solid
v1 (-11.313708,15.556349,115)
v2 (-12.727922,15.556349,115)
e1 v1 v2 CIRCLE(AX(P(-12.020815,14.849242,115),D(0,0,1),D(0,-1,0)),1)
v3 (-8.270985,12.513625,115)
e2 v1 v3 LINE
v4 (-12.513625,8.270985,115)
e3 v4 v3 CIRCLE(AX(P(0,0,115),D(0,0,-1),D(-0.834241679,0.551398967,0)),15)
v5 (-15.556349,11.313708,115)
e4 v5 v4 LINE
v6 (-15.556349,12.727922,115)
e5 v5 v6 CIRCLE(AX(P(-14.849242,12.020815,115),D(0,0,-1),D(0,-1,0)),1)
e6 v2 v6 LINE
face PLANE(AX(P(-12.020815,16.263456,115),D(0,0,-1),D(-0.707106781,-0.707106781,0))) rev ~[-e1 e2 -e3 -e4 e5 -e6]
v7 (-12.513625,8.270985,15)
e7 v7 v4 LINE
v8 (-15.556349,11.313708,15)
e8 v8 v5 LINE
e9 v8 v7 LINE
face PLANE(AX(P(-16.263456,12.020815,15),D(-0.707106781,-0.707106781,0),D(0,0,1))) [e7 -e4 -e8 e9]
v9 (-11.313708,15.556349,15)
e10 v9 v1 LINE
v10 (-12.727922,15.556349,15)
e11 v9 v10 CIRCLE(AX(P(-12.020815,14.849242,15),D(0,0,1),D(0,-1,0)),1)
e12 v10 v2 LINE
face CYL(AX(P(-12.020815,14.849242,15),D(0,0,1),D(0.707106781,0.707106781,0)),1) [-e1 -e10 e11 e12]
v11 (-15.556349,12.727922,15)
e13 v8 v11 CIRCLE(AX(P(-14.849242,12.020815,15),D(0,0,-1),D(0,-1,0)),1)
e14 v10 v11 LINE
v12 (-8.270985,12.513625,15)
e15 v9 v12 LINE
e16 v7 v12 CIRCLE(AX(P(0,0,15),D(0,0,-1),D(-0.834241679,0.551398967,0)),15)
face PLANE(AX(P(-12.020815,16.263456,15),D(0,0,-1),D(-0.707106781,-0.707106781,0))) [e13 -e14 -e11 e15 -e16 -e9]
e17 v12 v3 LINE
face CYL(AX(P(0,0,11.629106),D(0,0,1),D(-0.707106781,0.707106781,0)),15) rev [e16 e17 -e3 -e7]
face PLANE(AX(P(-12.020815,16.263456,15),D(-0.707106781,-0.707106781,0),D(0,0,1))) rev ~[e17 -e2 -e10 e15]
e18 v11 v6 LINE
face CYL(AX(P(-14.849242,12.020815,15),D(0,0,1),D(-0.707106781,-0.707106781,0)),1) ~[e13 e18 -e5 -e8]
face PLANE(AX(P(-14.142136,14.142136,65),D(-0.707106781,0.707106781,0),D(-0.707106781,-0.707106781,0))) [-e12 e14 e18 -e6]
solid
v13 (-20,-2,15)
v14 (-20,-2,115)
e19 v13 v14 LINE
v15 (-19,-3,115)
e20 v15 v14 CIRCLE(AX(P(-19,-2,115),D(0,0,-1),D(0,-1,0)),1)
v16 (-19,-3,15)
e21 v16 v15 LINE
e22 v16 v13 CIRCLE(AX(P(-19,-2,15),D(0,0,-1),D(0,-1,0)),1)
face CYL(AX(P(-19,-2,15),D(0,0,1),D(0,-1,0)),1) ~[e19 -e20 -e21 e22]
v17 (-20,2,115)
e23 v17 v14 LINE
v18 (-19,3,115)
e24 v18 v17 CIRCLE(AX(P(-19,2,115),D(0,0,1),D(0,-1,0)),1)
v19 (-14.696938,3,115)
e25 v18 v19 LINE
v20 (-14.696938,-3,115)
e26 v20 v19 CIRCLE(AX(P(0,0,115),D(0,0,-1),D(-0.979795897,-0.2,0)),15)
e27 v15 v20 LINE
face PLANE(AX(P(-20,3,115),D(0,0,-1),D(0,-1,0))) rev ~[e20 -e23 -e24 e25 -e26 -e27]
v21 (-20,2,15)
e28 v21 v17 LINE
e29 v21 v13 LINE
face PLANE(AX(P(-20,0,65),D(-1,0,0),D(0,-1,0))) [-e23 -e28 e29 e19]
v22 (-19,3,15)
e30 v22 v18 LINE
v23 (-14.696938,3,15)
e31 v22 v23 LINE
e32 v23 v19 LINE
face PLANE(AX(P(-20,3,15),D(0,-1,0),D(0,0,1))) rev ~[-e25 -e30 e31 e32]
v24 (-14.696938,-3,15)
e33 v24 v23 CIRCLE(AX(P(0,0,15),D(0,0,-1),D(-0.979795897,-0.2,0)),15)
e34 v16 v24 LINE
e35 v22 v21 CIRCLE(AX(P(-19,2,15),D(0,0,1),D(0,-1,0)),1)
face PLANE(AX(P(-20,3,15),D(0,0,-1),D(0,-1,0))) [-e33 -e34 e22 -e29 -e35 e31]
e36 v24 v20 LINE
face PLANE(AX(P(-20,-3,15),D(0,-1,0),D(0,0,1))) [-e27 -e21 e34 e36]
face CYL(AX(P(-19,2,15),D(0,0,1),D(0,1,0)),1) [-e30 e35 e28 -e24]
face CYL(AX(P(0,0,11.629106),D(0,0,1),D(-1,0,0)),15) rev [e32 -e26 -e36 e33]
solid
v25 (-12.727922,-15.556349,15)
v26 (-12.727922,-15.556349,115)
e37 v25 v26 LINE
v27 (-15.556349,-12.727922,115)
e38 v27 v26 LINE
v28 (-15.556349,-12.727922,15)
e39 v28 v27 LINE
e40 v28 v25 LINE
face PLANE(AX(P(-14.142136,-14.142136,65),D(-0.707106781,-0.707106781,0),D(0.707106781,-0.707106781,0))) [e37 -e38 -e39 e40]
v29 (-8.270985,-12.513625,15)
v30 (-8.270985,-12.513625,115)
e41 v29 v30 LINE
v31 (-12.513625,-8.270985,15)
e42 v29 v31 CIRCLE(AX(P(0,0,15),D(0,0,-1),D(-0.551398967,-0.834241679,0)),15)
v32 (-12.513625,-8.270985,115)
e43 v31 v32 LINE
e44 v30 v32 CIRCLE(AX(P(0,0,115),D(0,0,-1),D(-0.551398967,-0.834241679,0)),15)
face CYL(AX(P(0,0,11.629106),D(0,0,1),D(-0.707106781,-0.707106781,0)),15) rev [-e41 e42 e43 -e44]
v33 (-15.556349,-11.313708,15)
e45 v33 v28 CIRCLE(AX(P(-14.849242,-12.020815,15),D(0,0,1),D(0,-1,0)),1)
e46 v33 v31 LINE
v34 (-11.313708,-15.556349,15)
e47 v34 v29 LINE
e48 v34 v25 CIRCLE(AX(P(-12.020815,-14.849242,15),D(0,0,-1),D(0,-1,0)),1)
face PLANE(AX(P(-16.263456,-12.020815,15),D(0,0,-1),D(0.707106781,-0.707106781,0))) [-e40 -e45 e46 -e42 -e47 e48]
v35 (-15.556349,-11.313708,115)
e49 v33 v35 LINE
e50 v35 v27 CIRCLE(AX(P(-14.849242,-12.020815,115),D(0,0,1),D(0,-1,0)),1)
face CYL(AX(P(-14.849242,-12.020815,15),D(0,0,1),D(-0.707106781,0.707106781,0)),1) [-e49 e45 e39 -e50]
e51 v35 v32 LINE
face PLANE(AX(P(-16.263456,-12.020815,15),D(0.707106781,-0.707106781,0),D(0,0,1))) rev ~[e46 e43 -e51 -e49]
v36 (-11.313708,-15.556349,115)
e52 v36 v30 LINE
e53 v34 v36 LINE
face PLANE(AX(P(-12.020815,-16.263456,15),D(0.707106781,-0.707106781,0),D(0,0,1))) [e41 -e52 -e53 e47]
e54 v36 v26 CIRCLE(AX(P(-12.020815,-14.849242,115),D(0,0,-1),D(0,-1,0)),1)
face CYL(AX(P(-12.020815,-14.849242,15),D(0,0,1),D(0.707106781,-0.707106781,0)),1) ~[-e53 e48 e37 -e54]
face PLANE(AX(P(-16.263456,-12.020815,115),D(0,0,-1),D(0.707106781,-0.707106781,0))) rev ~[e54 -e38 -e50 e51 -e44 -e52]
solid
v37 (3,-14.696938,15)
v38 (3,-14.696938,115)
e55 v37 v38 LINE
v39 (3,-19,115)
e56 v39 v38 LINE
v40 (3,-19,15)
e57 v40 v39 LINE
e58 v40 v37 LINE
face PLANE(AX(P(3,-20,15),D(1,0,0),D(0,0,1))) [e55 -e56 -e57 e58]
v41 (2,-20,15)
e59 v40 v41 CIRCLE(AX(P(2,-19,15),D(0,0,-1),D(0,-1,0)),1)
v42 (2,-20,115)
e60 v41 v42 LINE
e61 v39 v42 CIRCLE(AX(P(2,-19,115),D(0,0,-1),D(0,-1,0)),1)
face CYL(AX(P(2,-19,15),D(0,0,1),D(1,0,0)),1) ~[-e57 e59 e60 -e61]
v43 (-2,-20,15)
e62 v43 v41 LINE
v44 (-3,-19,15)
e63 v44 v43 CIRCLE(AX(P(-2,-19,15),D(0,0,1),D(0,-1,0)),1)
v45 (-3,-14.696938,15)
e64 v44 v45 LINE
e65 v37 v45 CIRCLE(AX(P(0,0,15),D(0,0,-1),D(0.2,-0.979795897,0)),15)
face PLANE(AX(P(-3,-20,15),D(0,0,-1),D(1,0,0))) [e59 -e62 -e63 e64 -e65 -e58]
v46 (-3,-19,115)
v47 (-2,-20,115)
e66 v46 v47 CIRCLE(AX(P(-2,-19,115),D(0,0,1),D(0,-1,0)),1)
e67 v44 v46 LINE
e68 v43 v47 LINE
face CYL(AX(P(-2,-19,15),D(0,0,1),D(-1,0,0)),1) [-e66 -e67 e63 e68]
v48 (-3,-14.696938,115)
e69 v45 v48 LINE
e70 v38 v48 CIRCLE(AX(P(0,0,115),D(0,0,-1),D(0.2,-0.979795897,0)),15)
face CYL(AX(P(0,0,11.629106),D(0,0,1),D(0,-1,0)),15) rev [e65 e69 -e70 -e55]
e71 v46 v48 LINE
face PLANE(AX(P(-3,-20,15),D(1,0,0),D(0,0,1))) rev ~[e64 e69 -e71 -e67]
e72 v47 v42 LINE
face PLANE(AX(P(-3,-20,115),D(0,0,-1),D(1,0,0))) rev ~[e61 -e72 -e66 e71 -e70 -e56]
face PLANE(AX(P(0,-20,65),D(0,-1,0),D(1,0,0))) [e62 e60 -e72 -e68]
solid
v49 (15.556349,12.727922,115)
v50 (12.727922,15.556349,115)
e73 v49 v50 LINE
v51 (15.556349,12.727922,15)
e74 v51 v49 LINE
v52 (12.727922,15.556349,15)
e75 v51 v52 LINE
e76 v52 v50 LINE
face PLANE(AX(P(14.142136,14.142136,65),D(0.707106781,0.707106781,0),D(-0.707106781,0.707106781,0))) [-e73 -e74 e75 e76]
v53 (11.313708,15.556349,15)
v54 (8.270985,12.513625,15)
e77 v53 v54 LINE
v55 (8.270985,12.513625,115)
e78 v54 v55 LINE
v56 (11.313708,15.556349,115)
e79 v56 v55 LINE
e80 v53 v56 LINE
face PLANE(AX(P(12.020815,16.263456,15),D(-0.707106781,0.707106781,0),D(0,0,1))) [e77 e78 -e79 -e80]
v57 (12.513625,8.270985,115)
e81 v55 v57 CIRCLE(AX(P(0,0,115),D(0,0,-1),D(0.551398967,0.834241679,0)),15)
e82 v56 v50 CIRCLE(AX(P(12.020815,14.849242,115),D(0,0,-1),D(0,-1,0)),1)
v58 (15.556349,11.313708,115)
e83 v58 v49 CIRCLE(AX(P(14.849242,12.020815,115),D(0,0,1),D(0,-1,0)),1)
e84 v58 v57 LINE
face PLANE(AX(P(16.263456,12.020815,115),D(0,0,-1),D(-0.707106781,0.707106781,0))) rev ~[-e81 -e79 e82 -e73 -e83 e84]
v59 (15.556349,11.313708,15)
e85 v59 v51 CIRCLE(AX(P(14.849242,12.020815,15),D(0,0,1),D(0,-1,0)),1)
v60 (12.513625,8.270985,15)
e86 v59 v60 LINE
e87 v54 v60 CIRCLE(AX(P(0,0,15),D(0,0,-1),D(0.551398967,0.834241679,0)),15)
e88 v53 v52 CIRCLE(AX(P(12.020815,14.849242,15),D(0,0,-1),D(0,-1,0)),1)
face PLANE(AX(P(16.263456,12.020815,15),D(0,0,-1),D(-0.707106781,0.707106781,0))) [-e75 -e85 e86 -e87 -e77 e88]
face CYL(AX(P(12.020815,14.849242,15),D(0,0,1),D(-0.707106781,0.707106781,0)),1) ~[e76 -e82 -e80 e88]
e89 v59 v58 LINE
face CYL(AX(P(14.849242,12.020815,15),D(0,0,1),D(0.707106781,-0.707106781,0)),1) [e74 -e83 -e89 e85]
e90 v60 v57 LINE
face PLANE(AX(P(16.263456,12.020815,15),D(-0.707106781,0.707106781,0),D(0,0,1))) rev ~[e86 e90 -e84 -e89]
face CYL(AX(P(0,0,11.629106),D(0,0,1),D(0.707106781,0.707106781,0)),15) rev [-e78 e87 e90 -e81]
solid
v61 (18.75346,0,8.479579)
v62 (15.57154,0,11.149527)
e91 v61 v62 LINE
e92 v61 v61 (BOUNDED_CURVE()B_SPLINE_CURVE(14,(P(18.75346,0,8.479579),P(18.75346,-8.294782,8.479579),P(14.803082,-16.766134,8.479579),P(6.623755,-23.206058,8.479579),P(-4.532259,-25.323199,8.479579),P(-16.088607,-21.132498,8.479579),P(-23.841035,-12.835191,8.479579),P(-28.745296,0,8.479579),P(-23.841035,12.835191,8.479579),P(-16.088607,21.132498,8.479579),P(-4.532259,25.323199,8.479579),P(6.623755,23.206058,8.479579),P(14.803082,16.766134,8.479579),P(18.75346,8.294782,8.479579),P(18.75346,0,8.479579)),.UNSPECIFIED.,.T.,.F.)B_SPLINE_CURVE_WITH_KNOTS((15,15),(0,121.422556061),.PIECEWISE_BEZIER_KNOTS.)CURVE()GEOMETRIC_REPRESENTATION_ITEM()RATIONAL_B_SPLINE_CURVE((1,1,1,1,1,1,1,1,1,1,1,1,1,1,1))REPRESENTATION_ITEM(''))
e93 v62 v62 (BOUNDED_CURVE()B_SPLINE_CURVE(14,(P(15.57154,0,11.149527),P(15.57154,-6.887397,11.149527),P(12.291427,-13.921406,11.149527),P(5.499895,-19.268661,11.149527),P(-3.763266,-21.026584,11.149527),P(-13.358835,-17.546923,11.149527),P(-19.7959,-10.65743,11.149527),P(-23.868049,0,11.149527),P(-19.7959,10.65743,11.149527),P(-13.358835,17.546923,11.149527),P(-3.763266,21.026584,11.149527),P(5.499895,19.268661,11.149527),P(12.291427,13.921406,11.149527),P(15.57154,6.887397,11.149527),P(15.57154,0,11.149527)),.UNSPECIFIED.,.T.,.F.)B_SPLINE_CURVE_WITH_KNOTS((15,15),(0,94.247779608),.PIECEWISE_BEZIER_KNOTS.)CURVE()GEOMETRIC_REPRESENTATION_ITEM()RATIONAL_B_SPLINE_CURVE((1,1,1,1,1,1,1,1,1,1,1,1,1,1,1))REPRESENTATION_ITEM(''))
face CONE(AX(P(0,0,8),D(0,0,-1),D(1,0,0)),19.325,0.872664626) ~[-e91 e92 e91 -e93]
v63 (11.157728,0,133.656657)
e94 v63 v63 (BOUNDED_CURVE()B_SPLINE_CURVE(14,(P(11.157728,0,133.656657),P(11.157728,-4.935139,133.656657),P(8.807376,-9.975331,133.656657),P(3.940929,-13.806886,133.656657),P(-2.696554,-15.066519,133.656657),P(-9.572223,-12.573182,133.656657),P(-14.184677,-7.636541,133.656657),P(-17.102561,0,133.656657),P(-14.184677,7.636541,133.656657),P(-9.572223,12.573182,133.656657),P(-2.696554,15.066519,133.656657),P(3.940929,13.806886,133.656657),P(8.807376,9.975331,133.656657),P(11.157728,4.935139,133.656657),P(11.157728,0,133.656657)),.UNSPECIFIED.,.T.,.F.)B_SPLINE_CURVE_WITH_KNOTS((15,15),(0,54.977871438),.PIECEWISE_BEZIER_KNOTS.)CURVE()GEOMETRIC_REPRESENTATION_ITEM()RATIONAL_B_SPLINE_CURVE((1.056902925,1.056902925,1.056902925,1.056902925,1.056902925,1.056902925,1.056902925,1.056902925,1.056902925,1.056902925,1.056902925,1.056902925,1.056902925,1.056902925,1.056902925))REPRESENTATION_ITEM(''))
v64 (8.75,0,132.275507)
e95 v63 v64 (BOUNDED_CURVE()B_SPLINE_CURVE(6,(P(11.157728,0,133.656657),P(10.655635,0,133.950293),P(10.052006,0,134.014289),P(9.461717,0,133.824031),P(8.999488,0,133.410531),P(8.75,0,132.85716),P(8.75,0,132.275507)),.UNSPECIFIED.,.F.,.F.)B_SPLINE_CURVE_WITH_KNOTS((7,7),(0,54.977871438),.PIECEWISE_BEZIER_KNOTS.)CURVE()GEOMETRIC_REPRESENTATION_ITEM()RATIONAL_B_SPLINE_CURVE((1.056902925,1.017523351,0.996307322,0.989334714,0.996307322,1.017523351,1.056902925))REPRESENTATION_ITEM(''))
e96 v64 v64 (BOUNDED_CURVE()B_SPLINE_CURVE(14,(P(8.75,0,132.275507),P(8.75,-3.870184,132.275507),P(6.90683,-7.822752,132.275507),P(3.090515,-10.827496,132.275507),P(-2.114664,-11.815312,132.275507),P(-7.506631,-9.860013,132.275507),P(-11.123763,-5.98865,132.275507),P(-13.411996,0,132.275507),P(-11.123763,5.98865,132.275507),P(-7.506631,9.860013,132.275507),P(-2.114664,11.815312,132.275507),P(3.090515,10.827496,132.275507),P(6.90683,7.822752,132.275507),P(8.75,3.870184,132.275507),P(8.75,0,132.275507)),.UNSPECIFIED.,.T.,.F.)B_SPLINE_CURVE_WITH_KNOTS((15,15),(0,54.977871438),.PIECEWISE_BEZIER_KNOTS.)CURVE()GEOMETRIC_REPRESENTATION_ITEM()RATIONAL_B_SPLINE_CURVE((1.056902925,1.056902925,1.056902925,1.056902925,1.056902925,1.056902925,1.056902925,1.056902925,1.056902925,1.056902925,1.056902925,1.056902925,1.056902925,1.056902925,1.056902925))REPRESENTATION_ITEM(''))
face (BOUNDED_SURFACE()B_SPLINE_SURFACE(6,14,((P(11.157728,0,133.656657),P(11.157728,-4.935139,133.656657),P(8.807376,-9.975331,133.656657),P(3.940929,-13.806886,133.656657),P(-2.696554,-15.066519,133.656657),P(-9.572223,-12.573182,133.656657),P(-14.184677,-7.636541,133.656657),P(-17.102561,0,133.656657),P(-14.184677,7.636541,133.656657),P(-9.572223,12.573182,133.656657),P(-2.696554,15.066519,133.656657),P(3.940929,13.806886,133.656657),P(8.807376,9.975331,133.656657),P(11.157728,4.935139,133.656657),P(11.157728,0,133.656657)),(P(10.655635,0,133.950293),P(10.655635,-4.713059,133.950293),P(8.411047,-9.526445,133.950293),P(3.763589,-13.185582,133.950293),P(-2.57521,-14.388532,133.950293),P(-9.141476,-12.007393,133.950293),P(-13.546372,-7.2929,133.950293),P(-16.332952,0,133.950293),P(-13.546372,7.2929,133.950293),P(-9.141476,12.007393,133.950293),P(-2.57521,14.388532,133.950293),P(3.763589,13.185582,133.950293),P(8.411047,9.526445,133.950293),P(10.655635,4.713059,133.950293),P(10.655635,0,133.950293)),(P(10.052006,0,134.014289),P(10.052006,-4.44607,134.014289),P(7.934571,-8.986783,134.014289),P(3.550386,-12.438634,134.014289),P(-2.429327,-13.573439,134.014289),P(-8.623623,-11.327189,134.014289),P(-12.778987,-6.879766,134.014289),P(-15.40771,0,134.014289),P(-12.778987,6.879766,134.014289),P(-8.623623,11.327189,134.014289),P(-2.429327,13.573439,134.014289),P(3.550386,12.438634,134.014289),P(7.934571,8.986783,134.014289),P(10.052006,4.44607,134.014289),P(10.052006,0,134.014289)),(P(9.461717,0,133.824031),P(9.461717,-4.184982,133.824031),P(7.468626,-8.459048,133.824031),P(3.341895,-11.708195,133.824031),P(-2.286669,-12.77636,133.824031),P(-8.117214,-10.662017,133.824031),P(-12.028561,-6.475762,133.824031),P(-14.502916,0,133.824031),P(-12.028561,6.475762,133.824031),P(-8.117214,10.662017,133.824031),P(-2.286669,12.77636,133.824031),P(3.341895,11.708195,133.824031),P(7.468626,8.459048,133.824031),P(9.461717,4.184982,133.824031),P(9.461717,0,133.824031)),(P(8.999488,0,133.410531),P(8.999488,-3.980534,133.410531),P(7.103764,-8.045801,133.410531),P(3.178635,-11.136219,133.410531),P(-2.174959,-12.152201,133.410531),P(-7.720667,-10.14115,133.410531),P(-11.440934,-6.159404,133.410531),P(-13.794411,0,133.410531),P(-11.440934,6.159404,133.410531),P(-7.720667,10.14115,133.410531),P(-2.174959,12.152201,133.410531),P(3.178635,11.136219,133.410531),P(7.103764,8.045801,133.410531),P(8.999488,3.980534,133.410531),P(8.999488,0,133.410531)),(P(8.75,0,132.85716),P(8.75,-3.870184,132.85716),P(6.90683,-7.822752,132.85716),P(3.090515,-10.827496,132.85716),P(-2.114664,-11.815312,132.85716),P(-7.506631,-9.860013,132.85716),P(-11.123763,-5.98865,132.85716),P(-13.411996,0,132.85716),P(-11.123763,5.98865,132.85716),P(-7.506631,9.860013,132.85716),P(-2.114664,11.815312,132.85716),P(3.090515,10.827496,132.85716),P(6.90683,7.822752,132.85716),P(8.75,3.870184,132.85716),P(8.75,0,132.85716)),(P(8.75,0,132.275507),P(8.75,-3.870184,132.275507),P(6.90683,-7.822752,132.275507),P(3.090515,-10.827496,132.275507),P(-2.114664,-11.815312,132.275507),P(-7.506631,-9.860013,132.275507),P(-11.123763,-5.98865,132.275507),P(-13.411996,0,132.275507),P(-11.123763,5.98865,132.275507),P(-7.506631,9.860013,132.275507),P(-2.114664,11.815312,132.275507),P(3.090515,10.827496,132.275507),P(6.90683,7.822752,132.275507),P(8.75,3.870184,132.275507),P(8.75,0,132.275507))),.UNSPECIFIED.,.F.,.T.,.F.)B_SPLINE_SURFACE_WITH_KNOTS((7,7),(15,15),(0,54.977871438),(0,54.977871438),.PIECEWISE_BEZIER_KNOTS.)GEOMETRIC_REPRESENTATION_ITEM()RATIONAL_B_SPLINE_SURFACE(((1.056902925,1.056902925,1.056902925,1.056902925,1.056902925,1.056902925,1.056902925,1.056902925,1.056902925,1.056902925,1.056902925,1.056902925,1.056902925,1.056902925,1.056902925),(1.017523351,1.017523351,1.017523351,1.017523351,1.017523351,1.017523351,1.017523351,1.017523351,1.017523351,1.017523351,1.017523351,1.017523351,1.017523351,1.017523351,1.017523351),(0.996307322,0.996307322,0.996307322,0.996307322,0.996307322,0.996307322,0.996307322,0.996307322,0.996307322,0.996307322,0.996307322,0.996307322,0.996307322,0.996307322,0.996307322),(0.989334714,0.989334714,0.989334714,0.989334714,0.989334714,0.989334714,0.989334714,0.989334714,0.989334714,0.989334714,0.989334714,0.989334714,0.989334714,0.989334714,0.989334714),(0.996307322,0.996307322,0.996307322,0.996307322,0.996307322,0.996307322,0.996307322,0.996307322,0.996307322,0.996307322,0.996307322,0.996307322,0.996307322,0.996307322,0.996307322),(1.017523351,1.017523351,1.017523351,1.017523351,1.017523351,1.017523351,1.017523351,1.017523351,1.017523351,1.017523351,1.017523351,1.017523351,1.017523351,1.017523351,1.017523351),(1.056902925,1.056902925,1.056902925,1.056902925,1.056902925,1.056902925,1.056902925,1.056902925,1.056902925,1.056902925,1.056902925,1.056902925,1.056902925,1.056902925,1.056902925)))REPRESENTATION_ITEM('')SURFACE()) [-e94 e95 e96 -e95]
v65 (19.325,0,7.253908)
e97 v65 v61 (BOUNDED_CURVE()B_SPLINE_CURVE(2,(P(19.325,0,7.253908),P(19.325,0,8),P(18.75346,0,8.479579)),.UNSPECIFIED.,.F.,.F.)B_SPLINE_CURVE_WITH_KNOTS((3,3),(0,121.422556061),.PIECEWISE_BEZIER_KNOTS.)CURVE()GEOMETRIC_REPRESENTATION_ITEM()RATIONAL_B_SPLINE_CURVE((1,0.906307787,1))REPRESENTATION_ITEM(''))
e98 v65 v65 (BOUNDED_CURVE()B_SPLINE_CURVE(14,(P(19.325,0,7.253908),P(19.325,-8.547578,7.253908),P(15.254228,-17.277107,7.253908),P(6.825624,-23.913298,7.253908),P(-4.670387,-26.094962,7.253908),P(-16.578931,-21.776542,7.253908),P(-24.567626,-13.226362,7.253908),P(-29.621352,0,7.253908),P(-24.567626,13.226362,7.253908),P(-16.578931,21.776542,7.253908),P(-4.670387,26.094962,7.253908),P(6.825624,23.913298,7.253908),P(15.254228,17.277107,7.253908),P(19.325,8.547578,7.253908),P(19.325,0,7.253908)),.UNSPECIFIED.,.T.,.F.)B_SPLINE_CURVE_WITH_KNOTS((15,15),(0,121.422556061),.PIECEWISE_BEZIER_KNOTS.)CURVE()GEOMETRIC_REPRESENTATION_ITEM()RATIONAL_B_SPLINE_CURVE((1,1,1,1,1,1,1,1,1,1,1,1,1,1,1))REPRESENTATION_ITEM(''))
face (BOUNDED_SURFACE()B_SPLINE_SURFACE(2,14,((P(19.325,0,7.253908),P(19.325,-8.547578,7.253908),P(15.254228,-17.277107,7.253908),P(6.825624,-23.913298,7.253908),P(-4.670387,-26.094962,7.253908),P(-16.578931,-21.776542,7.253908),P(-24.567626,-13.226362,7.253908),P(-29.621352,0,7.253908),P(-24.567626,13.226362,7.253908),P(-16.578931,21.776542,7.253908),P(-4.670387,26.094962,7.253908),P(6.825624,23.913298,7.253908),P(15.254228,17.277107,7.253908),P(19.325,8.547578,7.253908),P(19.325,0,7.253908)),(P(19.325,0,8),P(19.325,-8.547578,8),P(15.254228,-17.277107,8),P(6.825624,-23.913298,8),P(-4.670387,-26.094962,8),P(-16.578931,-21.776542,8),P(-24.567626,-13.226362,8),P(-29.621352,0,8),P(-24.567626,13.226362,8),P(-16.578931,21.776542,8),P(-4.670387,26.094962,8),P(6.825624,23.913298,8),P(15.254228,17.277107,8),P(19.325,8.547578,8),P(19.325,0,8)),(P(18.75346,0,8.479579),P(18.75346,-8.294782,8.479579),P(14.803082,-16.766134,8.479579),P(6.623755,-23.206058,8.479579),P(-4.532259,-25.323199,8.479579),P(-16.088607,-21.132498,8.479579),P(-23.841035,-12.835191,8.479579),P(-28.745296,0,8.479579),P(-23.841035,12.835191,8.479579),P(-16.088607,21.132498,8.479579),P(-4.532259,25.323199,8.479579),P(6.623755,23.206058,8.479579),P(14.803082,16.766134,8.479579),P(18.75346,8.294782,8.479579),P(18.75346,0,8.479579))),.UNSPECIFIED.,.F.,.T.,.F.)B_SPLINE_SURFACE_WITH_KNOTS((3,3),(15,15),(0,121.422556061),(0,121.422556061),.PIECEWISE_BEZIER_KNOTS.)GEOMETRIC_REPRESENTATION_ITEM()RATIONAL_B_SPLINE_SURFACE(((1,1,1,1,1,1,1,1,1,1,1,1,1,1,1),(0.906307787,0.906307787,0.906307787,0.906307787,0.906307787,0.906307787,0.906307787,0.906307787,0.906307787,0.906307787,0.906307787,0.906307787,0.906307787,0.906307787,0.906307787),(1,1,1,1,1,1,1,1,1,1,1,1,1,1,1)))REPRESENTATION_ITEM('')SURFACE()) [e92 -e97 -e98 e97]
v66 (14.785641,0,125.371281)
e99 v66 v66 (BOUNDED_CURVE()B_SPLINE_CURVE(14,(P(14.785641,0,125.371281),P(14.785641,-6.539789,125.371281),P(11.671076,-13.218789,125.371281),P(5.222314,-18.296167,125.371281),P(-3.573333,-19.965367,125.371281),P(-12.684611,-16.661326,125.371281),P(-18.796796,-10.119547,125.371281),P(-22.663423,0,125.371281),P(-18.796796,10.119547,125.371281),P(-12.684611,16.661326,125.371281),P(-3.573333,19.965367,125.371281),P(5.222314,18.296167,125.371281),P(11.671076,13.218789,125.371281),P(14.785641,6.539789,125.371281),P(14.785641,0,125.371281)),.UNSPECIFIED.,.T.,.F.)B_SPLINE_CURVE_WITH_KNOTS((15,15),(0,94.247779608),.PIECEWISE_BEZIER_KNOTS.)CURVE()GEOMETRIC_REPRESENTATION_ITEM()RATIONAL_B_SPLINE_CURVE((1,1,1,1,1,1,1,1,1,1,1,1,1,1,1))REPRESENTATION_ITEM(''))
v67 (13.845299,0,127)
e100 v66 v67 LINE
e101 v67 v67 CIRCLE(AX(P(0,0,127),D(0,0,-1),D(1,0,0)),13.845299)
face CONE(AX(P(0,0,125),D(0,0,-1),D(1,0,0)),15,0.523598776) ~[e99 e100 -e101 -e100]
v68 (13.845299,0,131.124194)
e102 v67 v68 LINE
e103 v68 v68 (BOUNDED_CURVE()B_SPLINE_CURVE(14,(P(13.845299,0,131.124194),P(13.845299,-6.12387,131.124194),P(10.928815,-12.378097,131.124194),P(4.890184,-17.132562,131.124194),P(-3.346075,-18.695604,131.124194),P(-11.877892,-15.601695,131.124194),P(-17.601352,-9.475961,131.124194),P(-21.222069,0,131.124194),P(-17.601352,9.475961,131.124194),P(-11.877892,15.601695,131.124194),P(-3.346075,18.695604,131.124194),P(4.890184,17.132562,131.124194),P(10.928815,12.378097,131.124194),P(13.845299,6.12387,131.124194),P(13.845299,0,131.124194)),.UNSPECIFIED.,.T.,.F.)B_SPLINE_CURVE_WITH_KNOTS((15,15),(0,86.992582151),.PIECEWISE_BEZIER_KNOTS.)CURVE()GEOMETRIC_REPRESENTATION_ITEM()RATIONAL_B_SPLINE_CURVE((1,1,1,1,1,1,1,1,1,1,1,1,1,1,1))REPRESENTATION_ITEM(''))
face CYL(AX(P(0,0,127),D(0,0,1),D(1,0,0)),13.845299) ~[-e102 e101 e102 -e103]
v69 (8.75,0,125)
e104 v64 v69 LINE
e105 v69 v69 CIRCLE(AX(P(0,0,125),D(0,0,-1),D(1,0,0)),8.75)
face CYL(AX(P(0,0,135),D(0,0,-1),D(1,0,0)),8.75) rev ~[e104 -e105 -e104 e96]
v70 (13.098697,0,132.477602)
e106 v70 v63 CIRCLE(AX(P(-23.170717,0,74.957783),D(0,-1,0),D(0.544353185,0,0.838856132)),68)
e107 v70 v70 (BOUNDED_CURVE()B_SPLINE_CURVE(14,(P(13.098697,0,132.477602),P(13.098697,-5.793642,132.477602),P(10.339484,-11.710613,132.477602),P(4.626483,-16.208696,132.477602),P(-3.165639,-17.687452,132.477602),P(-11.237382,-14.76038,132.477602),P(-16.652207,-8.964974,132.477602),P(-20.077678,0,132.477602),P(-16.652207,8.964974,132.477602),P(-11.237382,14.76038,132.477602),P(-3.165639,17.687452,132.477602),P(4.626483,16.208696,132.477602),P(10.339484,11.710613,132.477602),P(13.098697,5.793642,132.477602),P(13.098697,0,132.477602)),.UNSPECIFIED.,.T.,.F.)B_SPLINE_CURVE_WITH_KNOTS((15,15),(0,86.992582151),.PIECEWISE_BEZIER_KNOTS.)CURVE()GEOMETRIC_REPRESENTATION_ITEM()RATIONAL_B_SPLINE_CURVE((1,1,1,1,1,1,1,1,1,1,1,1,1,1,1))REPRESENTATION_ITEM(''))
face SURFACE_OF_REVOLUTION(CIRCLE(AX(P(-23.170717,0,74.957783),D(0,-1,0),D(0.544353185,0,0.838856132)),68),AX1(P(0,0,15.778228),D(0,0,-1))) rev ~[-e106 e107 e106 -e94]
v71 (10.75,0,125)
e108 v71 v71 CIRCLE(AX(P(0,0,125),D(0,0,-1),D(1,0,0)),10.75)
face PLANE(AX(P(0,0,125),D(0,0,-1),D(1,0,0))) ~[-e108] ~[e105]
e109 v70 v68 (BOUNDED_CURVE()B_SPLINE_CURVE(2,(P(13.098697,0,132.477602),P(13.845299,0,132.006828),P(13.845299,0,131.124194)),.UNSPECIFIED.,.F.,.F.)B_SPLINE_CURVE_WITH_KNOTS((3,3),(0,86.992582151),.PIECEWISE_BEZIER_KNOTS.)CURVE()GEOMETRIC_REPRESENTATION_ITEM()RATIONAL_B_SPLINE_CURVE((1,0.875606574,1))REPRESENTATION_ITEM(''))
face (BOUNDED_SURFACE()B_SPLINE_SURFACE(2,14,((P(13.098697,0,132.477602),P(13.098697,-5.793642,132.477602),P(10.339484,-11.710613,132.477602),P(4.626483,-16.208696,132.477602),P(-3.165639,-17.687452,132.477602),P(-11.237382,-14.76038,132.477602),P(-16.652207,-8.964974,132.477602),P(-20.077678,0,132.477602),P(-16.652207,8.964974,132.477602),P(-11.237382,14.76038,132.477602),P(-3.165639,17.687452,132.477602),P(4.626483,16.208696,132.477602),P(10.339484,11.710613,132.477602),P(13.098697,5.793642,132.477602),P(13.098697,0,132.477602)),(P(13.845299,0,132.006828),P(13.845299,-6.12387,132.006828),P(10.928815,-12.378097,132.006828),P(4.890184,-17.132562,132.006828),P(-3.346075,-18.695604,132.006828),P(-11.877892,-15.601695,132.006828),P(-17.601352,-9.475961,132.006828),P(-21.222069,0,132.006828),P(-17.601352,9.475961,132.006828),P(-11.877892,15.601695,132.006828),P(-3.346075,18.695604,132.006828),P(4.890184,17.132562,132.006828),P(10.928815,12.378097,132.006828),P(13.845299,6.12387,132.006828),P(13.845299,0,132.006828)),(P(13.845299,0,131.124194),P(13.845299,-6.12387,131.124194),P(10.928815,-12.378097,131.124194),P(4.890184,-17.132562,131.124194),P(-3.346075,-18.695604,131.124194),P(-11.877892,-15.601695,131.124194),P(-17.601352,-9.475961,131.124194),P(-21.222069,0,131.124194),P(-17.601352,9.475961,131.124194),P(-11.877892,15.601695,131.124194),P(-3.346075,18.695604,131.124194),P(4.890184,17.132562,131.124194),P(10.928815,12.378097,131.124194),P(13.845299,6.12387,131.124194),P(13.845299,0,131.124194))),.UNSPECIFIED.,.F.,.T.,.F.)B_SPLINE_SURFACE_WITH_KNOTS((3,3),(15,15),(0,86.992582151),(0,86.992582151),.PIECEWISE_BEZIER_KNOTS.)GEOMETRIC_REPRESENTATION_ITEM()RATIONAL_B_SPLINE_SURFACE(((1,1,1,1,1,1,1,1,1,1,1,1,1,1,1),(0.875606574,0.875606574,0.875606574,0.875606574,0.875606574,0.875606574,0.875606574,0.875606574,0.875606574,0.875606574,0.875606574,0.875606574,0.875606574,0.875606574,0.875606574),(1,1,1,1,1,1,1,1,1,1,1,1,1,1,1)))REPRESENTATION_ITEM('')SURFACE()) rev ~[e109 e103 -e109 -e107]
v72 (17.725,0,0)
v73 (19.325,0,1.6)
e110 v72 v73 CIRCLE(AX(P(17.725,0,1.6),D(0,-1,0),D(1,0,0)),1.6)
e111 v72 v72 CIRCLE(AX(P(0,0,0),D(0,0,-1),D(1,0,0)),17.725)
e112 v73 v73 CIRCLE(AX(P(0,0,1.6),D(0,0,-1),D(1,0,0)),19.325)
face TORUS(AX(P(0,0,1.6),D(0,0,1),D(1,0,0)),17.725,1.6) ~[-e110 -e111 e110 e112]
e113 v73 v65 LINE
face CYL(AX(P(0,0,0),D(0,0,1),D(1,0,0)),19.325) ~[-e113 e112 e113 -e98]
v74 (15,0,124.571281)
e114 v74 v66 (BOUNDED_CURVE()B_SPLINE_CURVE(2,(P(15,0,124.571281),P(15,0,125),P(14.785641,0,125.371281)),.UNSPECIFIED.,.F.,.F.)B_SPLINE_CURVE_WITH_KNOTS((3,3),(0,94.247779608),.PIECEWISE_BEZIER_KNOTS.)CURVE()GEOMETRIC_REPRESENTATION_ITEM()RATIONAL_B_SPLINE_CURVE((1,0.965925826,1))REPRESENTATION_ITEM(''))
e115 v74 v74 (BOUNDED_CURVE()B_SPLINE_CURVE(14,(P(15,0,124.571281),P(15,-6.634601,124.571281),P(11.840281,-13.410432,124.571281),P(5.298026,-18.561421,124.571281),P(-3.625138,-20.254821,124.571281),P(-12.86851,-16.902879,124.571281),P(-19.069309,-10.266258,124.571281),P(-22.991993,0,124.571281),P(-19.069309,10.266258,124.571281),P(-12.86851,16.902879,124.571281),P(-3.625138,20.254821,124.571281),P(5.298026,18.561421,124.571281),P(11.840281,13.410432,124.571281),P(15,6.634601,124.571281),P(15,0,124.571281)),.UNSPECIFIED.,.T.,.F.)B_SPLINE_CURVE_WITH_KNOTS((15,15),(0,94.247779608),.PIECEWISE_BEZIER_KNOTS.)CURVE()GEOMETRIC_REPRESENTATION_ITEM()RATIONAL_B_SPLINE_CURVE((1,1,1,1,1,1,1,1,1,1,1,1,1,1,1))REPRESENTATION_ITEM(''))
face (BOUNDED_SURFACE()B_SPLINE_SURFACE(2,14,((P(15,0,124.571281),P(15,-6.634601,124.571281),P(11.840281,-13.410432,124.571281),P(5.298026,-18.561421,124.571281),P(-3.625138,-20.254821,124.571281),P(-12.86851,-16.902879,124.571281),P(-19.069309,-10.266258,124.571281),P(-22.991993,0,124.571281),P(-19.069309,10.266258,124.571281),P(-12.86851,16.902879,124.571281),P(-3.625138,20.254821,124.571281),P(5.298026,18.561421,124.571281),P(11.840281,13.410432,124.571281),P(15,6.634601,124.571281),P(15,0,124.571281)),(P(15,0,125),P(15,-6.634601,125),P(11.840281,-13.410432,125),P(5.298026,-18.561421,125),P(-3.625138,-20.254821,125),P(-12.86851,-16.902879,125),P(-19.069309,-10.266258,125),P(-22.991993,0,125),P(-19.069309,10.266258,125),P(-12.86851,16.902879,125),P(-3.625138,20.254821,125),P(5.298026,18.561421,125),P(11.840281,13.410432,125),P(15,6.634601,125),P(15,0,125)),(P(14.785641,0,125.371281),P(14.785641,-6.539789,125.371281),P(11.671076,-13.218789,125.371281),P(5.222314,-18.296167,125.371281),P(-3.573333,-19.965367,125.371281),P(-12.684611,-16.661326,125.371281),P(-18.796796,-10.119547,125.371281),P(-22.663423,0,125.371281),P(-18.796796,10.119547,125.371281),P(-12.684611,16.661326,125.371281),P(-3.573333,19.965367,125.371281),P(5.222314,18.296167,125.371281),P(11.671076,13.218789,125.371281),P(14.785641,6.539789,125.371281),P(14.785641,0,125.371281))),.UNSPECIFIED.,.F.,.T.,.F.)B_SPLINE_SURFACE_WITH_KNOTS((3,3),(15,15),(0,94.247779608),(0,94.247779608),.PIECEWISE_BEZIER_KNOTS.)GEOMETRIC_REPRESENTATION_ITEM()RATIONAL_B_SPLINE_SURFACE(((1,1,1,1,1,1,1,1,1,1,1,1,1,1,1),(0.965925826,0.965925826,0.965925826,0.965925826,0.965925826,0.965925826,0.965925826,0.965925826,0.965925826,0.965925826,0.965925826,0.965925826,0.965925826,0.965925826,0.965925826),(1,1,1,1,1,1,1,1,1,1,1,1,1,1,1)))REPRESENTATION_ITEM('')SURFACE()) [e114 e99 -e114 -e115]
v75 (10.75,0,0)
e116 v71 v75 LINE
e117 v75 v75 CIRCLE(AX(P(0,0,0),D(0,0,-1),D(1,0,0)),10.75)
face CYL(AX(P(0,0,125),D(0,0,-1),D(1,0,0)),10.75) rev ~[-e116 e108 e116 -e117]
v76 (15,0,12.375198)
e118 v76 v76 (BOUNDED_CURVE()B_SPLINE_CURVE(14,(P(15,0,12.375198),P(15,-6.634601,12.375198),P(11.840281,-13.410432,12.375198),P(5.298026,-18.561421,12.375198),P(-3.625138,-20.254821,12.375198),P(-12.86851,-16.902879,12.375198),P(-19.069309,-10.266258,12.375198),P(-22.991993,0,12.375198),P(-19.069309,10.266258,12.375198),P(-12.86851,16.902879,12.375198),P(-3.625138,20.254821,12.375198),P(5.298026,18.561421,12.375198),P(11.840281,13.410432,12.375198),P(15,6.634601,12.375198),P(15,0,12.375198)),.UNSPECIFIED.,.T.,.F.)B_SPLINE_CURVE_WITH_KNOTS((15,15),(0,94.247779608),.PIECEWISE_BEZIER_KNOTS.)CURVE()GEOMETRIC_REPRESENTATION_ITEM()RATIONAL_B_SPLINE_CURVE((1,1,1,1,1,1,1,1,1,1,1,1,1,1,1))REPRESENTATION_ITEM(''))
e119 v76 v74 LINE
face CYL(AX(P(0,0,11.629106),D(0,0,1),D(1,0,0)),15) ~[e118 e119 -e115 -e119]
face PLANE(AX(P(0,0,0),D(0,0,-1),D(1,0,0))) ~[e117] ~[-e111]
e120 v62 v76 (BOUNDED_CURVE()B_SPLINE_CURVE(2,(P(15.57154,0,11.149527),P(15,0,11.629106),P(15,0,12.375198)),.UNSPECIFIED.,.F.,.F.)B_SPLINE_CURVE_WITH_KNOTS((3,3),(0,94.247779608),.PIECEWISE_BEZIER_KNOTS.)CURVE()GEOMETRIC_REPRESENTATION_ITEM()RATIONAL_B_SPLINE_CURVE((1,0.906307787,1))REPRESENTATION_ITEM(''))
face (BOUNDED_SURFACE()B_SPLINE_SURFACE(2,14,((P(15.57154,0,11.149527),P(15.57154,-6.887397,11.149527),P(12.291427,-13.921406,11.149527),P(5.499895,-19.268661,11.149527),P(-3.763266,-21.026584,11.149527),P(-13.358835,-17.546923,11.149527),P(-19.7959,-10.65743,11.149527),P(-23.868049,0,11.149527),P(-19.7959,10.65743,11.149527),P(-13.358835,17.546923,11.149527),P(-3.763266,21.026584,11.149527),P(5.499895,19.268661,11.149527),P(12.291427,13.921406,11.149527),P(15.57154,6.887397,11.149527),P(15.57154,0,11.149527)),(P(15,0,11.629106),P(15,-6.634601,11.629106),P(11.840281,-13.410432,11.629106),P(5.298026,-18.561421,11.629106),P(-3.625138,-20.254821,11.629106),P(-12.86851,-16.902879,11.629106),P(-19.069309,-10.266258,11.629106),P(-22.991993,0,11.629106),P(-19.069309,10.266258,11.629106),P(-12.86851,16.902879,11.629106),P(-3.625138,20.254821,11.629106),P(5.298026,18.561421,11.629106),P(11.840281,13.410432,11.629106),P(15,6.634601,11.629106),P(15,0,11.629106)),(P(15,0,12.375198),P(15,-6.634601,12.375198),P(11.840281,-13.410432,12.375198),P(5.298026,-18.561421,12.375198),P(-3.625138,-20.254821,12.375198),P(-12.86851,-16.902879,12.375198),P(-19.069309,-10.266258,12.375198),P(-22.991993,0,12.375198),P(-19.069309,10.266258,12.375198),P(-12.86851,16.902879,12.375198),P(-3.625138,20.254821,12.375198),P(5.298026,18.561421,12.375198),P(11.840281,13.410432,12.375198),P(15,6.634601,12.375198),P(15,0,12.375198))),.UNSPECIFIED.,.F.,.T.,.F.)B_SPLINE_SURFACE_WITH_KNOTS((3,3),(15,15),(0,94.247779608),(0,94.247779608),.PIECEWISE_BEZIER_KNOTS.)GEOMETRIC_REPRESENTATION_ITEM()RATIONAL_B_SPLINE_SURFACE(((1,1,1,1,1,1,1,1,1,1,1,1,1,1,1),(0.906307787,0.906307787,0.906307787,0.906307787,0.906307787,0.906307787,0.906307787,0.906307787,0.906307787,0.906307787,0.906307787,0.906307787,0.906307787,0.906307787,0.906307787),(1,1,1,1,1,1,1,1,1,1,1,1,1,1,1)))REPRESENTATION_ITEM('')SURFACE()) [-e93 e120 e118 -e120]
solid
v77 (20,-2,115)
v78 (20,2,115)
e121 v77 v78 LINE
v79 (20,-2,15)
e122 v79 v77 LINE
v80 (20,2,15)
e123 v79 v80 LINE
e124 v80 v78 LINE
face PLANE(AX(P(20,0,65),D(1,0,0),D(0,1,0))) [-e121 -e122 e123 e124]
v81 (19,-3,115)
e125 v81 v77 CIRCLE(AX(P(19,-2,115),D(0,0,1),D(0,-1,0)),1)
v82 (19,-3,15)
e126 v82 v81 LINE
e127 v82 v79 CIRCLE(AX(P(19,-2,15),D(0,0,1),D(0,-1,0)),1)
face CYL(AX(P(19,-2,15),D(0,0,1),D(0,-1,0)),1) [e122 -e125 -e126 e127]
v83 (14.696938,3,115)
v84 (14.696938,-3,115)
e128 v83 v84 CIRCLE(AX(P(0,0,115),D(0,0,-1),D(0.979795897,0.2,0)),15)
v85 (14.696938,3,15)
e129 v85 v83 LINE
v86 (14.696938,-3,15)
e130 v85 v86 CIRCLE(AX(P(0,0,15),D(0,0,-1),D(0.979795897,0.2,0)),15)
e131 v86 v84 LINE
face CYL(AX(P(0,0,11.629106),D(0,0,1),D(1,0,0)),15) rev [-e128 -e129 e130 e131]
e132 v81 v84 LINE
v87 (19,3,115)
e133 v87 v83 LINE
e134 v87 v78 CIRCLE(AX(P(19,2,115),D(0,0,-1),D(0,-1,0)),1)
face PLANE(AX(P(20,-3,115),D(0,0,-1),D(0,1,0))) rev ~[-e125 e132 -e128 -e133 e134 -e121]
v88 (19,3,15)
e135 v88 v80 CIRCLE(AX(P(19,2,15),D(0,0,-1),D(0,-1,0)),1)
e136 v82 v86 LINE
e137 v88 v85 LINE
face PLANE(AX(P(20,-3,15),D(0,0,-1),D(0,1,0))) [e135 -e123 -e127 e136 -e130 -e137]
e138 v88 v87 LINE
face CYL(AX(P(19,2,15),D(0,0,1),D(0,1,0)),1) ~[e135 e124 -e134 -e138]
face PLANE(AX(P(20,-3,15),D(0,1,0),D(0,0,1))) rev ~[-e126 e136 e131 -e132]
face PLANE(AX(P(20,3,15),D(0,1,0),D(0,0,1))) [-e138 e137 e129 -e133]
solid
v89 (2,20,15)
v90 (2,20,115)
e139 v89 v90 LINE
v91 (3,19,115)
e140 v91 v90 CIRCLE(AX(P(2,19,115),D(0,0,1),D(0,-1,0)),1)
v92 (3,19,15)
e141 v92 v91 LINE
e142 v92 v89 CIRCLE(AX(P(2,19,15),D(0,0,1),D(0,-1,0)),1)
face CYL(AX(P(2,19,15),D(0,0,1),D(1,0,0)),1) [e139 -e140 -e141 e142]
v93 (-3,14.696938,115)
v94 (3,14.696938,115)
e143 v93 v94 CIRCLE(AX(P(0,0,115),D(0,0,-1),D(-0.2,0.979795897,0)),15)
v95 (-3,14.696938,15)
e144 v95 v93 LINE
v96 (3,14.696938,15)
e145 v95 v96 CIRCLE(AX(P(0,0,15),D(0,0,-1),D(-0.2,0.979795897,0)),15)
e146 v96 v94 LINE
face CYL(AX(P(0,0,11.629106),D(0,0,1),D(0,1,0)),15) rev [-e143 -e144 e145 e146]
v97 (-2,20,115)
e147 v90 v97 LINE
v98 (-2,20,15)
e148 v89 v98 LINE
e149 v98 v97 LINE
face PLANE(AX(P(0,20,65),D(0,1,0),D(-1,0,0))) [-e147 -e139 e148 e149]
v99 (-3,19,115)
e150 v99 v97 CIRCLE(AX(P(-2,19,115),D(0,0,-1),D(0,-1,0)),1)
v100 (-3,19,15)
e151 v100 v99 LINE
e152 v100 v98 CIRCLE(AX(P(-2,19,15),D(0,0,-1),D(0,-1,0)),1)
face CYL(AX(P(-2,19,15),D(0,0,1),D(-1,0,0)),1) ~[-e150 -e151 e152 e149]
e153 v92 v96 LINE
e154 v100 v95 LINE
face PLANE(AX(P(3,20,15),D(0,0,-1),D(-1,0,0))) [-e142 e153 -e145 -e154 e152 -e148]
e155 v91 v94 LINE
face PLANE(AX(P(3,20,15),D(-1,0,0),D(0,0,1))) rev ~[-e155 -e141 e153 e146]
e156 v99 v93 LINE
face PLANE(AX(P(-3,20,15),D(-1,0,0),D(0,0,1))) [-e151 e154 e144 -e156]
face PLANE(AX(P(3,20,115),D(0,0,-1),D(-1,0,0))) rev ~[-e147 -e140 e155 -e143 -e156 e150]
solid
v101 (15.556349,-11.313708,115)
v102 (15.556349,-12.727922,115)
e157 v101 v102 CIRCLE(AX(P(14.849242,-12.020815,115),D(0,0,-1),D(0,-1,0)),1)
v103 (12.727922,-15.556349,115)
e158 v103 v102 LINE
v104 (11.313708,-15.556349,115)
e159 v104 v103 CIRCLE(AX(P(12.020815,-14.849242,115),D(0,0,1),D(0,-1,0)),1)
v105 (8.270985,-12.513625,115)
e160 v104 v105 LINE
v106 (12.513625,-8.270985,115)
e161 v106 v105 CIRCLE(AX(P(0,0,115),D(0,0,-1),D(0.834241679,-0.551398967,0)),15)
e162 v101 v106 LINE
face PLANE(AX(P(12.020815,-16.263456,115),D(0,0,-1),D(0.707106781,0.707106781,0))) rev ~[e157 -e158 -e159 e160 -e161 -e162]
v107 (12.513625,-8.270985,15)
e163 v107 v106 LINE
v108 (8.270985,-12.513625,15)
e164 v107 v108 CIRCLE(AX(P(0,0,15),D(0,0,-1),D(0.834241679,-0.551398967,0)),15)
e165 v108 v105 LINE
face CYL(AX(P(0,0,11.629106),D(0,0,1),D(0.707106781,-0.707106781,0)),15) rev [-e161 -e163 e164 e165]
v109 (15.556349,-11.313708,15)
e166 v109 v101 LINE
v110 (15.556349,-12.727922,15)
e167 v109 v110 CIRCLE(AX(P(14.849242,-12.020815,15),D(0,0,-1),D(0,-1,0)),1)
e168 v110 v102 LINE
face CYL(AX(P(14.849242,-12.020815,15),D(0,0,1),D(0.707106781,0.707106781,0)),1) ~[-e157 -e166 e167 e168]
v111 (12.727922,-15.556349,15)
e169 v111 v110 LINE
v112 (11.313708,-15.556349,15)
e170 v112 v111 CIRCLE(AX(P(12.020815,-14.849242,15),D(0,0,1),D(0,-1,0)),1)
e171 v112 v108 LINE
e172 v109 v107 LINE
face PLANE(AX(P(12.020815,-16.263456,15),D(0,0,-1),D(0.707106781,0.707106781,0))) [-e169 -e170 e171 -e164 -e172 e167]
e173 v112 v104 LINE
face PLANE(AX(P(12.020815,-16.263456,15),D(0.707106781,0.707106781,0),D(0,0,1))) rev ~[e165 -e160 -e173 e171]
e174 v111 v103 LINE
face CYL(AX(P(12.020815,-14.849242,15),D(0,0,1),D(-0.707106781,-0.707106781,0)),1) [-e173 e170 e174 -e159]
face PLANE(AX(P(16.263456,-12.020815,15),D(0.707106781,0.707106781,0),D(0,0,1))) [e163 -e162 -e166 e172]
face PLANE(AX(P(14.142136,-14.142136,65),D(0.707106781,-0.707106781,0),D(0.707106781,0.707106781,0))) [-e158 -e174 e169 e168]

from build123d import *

# Parameters (mm, degrees)
F2_R            = 1.6
F4_W            = 6
F4_H            = 100
F5_COPIES_COUNT = 8
F6_R            = 1
F6_2_R          = 1
F6_3_R          = 1
F6_4_R          = 1
F6_5_R          = 1
F6_6_R          = 1
F6_7_R          = 1
F6_8_R          = 1


# Not quite as in the source:
# - a feature of the source that left no trace in its solid (it failed there, or was rolled back) is left out
# - a pattern or mirror of a feature is missing from the dataset's text; its kind, count and spacing are read off the source's solid


with BuildPart() as f1:
    # F0 (on Front) → F1 (revolve)
    with BuildSketch(Plane.XZ):
        with BuildLine():
            ThreePointArc((13.8452994616, 132), (11.3302729145, 133.5554082968), (8.75, 135))
            Line((8.75, 135), (8.75, 125))
            Line((8.75, 125), (10.75, 125))
            Line((10.75, 125), (10.75, 0))
            Line((10.75, 0), (19.325, 0))
            Line((19.325, 0), (19.325, 8))
            Line((19.325, 8), (15, 11.6291059048))
            Line((15, 11.6291059048), (15, 125))
            Line((15, 125), (13.8452994616, 127))
            Line((13.8452994616, 127), (13.8452994616, 132))
        make_face()
    revolve(axis=Axis((0, 0, 15.7782279773), (0, 0, -1)))

    # F2
    f2_edges = [f1.edges().sort_by_distance(p)[0] for p in [
        (-8.75, 0, 135),
        (-13.845299, 0, 132),
        (-15, 0, 125),
        (-15, 0, 11.629106),
        (-19.325, 0, 8),
        (-19.325, 0, 0),
    ]]
    fillet(f2_edges, radius=F2_R)


with BuildPart() as f5:
    # F4 (on offset) → F5 (new body, up to the next surface of F1)
    with BuildSketch(Plane.YZ.offset(20)):
        with Locations((0, 65)):
            Rectangle(F4_W, F4_H)
    extrude(until=Until.NEXT, target=f1.part, dir=(-1, 0, 0))


with BuildPart() as f5_copies_1:
    # F5_copies: instance of F5
    add(f5.part.rotate(Axis((0, 0, 0), (0, 0, 1)), 1 * 360 / F5_COPIES_COUNT))

    # F6#2
    f6_2_edges = [f5_copies_1.edges().sort_by_distance(p)[0] for p in [
        (16.263456, 12.020815, 65),
        (12.020815, 16.263456, 65),
    ]]
    fillet(f6_2_edges, radius=F6_2_R)


with BuildPart() as f5_copies_2:
    # F5_copies: instance of F5
    add(f5.part.rotate(Axis((0, 0, 0), (0, 0, 1)), 2 * 360 / F5_COPIES_COUNT))

    # F6#3
    f6_3_edges = [f5_copies_2.edges().sort_by_distance(p)[0] for p in [
        (3, 20, 65),
        (-3, 20, 65),
    ]]
    fillet(f6_3_edges, radius=F6_3_R)


with BuildPart() as f5_copies_3:
    # F5_copies: instance of F5
    add(f5.part.rotate(Axis((0, 0, 0), (0, 0, 1)), 3 * 360 / F5_COPIES_COUNT))

    # F6#4
    f6_4_edges = [f5_copies_3.edges().sort_by_distance(p)[0] for p in [
        (-12.020815, 16.263456, 65),
        (-16.263456, 12.020815, 65),
    ]]
    fillet(f6_4_edges, radius=F6_4_R)


with BuildPart() as f5_copies_4:
    # F5_copies: instance of F5
    add(f5.part.rotate(Axis((0, 0, 0), (0, 0, 1)), 4 * 360 / F5_COPIES_COUNT))

    # F6#5
    f6_5_edges = [f5_copies_4.edges().sort_by_distance(p)[0] for p in [
        (-20, 3, 65),
        (-20, -3, 65),
    ]]
    fillet(f6_5_edges, radius=F6_5_R)


with BuildPart() as f5_copies_5:
    # F5_copies: instance of F5
    add(f5.part.rotate(Axis((0, 0, 0), (0, 0, 1)), 5 * 360 / F5_COPIES_COUNT))

    # F6#6
    f6_6_edges = [f5_copies_5.edges().sort_by_distance(p)[0] for p in [
        (-16.263456, -12.020815, 65),
        (-12.020815, -16.263456, 65),
    ]]
    fillet(f6_6_edges, radius=F6_6_R)


with BuildPart() as f5_copies_6:
    # F5_copies: instance of F5
    add(f5.part.rotate(Axis((0, 0, 0), (0, 0, 1)), 6 * 360 / F5_COPIES_COUNT))

    # F6#7
    f6_7_edges = [f5_copies_6.edges().sort_by_distance(p)[0] for p in [
        (-3, -20, 65),
        (3, -20, 65),
    ]]
    fillet(f6_7_edges, radius=F6_7_R)


with BuildPart() as f5_copies_7:
    # F5_copies: instance of F5
    add(f5.part.rotate(Axis((0, 0, 0), (0, 0, 1)), 7 * 360 / F5_COPIES_COUNT))

    # F6#8
    f6_8_edges = [f5_copies_7.edges().sort_by_distance(p)[0] for p in [
        (12.020815, -16.263456, 65),
        (16.263456, -12.020815, 65),
    ]]
    fillet(f6_8_edges, radius=F6_8_R)


with BuildPart() as f5_1:
    add(f5.part)

    # F6
    f6_edges = [f5_1.edges().sort_by_distance(p)[0] for p in [
        (20, -3, 65),
        (20, 3, 65),
    ]]
    fillet(f6_edges, radius=F6_R)


solid = Compound([f1.part, f5_copies_1.part, f5_copies_2.part, f5_copies_3.part, f5_copies_4.part, f5_copies_5.part, f5_copies_6.part, f5_copies_7.part, f5_1.part])
